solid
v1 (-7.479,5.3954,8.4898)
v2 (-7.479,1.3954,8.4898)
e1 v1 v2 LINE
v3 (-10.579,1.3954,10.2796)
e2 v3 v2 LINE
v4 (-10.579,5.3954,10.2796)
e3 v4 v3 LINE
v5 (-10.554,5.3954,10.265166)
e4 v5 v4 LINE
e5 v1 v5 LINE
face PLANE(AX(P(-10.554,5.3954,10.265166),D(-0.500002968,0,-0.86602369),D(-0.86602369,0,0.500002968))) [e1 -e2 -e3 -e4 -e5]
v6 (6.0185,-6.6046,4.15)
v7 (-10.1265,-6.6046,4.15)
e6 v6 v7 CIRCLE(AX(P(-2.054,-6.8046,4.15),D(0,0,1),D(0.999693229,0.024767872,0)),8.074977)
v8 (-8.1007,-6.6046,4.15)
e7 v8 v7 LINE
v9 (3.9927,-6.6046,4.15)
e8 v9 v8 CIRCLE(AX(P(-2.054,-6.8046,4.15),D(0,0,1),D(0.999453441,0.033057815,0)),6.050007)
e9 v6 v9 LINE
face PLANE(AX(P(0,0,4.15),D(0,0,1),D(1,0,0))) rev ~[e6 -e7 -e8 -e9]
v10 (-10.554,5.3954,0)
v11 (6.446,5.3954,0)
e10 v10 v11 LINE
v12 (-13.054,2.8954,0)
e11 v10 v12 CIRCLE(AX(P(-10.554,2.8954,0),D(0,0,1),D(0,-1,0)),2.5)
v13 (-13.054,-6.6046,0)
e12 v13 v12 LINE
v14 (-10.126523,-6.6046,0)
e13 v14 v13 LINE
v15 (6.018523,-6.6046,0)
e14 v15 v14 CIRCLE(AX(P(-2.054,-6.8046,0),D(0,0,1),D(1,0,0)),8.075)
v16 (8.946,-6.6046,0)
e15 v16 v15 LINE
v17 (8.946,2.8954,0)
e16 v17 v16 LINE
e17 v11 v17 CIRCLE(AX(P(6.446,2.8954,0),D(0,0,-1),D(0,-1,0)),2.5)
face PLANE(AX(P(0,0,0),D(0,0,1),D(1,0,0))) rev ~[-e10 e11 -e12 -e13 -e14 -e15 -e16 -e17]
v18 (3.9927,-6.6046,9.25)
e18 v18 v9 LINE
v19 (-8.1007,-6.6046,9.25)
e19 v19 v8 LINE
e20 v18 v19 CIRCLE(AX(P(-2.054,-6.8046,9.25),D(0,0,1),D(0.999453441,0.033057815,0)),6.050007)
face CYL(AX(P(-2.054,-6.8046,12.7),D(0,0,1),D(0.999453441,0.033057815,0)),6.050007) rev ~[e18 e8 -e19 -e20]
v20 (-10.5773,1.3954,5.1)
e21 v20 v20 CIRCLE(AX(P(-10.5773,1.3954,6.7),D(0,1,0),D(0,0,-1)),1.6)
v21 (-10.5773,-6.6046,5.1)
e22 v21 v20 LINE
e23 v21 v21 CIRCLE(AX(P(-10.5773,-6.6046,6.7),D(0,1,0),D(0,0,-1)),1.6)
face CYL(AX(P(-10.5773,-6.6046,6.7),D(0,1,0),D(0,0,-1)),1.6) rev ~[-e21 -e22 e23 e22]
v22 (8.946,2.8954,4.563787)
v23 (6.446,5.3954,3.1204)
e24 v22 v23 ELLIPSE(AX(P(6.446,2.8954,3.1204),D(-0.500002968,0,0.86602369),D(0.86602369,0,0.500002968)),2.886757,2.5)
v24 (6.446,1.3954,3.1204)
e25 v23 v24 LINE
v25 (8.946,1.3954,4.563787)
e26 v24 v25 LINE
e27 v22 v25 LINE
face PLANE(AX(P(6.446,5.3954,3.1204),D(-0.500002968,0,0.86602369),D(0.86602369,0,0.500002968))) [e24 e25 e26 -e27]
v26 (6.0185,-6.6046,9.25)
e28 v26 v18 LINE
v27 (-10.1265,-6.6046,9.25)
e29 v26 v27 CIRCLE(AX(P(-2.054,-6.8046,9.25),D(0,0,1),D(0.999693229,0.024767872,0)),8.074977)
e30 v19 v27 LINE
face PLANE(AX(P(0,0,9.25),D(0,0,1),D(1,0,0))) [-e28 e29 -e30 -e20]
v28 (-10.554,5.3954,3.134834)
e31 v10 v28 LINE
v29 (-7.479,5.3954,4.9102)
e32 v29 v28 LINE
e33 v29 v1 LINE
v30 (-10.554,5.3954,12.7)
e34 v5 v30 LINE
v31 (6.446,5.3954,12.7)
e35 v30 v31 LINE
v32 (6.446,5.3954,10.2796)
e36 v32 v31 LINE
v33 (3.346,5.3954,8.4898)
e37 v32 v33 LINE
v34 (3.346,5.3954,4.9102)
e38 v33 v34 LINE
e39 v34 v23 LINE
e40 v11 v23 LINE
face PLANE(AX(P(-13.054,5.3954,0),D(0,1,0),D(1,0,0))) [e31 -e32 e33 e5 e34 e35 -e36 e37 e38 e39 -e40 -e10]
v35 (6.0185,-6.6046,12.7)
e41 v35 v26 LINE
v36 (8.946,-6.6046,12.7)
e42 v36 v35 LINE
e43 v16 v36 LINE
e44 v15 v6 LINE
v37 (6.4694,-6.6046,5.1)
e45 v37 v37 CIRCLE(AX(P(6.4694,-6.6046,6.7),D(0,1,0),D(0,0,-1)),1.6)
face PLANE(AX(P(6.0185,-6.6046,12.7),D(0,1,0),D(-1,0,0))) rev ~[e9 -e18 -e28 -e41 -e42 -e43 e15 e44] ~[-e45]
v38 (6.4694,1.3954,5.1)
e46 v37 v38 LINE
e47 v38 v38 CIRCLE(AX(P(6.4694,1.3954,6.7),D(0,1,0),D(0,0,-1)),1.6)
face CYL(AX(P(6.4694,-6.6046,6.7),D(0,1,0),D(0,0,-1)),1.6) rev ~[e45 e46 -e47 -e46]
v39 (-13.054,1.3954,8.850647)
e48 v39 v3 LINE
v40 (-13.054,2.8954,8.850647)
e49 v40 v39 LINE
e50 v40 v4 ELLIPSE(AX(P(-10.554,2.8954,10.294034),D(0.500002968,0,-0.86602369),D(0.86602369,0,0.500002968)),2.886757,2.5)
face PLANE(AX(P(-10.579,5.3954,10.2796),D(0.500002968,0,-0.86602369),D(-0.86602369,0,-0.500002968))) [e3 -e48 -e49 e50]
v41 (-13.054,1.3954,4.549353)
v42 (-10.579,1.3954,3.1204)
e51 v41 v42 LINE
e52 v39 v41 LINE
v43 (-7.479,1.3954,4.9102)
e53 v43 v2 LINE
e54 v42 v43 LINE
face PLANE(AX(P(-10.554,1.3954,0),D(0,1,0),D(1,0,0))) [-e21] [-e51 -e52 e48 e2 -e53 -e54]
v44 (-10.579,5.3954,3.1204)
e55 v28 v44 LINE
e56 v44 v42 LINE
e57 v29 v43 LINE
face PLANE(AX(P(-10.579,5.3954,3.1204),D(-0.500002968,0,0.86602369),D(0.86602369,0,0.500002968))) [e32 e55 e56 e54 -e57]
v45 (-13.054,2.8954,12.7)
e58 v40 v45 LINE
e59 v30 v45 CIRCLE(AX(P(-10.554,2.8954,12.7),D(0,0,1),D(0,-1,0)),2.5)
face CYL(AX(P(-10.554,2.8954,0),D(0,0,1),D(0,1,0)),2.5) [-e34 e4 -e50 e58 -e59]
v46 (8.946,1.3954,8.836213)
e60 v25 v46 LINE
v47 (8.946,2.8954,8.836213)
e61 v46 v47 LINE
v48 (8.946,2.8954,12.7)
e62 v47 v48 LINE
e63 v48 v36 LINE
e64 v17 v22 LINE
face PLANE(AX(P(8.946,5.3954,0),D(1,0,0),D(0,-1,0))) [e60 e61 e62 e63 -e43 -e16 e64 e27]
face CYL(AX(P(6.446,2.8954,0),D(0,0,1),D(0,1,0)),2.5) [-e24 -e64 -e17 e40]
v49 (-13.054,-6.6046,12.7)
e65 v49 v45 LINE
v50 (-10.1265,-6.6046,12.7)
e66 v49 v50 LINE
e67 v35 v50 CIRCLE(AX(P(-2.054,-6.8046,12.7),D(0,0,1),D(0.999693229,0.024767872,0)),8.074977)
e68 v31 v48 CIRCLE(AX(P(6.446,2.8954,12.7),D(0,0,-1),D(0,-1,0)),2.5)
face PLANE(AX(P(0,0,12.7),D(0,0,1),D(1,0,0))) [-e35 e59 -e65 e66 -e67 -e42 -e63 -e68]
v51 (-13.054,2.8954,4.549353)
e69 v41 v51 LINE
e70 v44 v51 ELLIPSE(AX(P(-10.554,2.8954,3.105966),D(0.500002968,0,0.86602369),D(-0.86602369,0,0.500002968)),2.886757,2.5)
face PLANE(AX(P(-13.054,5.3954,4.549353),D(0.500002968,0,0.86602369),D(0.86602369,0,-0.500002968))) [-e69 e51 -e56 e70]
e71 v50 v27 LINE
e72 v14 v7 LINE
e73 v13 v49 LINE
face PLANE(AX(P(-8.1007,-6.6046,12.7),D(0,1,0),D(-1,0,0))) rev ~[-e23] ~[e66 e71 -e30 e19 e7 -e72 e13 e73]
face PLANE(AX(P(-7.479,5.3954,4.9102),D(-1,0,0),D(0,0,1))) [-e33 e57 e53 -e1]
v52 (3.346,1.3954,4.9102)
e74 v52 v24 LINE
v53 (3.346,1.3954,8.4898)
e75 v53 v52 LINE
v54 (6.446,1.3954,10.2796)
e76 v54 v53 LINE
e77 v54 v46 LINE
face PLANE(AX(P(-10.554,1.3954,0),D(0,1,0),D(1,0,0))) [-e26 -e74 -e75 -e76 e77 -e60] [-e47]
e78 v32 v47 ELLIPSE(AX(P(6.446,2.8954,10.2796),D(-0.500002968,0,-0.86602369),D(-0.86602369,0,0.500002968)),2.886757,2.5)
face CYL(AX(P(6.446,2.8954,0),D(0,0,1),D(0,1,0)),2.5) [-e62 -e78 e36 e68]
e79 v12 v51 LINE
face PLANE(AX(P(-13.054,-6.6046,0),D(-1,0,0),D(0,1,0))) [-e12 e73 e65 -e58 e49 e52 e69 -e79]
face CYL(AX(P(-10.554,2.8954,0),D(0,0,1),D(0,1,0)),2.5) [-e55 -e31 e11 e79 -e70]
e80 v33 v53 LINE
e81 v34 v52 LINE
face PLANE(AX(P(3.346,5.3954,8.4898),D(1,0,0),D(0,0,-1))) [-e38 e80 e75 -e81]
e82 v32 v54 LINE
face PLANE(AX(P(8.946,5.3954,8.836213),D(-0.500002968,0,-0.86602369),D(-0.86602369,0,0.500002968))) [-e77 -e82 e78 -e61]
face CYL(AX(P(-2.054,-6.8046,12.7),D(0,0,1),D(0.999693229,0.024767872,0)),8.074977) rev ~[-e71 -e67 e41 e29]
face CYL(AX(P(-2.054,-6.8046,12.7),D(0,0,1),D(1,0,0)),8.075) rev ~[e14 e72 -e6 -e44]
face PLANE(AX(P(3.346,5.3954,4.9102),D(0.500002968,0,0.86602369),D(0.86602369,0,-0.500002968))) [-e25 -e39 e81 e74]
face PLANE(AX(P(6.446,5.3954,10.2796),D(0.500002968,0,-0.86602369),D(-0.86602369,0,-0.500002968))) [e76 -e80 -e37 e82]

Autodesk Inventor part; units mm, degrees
ref_plane "YZ Plane" through (0, 0, 0) normal (1, 0, 0) x (0, 1, 0)
ref_plane "XZ Plane" through (0, 0, 0) normal (0, 1, 0) x (-1, 0, 0)
ref_plane "XY Plane" through (0, 0, 0) normal (0, 0, 1) x (1, 0, 0)
sketch "Szkic1" plane through (0, 0, 0) normal (0, 0, 1) x (1, 0, 0)
  line L0 (-13.054, 5.3954) -> (8.946, 5.3954)
  line L1 (8.946, 5.3954) -> (8.946, -6.6046)
  line L2 (8.946, -6.6046) -> (-13.054, -6.6046)
  line L3 (-13.054, -6.6046) -> (-13.054, 5.3954)
  point P0 (0, 0)
  dimension "d0" = 22
  dimension "d1" = 12
extrude "Wyciągnięcie proste1" add sketch "Szkic1" along normal blind 12.7
fillet "Zaokrąglenie1" radius 2.5 2 edges at (-13.054, 5.3954, 6.35) (8.946, 5.3954, 6.35)
sketch "Szkic2" plane through (0, 0, 12.7) normal (0, 0, 1) x (1, 0, 0)
  line L0 (8.946, -6.6046) -> (8.946, 2.8954) projected
  line L1 (-13.054, 2.8954) -> (-13.054, -6.6046) projected
  circle A0 centre (-2.054, -6.8046) radius 8.075
  line L2 (6.446, 5.3954) -> (-10.554, 5.3954) projected
  point P0 (0, 0)
  dimension "d5" = 22
  dimension "d6" = 11
  dimension "d7" = 16.15
  dimension "d10" = 12.2
extrude "Wyciągnięcie proste2" cut sketch "Szkic2" against normal blind 12.7
sketch "Szkic3" plane through (0, 0, 12.7) normal (0, 0, 1) x (1, 0, 0)
  arc A0 (6.0185, -6.6046) -> (-10.1265, -6.6046) centre (-2.054, -6.8046) ccw projected
  line L0 (6.0185, -6.6046) -> (8.946, -6.6046) projected
  line L1 (8.946, -6.6046) -> (8.946, 2.8954) projected
  arc A1 (8.946, 2.8954) -> (6.446, 5.3954) centre (6.446, 2.8954) ccw projected
  line L2 (6.446, 5.3954) -> (-10.554, 5.3954) projected
  arc A2 (-10.554, 5.3954) -> (-13.054, 2.8954) centre (-10.554, 2.8954) ccw projected
  line L3 (-13.054, 2.8954) -> (-13.054, -6.6046) projected
  line L4 (-13.054, -6.6046) -> (-10.1265, -6.6046) projected
  arc A3 (3.9927, -6.6046) -> (-8.1007, -6.6046) centre (-2.054, -6.8046) ccw
  arc A4 (6.0185, -6.6046) -> (-10.1265, -6.6046) centre (-2.054, -6.8046) ccw projected
  line L5 (6.0185, -6.6046) -> (-10.1265, -6.6046)
  point P0 (0, 0)
  dimension "d11" = 12.1
extrude "Wyciągnięcie proste3" add sketch "Szkic3" against normal blind 8.55 contours L5 A3 A0
extrude "Wyciągnięcie proste4" cut sketch "Szkic3" against normal blind 3.45 contours L5 A3 A0
sketch "Szkic4" plane through (-13.054, -6.6046, 0) normal (0, -1, 0) x (1, 0, 0)
  line L0 (0, 0) -> (0, 12.7) projected
  line L1 (22, 0) -> (22, 12.7) projected
  line L2 (4.9533, 9.25) -> (2.9275, 9.25) projected
  line L3 (19.0725, 9.25) -> (17.0467, 9.25) projected
  line L4 (4.9533, 9.25) -> (4.9533, 4.15) projected
  line L5 (4.9533, 4.15) -> (2.9275, 4.15) projected
  point P0 (13.054, 0)
  point P1 (2.4767, 6.7)
  point P2 (19.5233, 6.7)
  dimension "d16" = 2.4766
  dimension "d17" = 2.4766
  dimension "d18" = 2.55
  dimension "d19" = 2.55
  dimension "d33" = 4.9533
  dimension "d34" = 5.1
hole "Otwór1" at (-10.5773, -6.6046, 6.7) at (6.4694, -6.6046, 6.7) direction (0, 1, 0) diameter 3.2 end through all
sketch "Szkic5" plane through (-10.554, 5.3954, 0) normal (0, 1, 0) x (1, 0, 0)
  arc A0 (0, -8.2998) -> (0, -5.1002) centre (-0.0233, -6.7) ccw projected
  line L0 (0, -12.7) -> (0, -8.2998) projected
  line L1 (17, -12.7) -> (0, -12.7) projected
  line L2 (17, -8.2998) -> (17, -12.7) projected
  arc A1 (17, -5.1002) -> (17, -8.2998) centre (17.0233, -6.7) ccw projected
  line L3 (17, 0) -> (17, -5.1002) projected
  line L4 (0, 0) -> (17, 0) projected
  line L5 (0, -5.1002) -> (0, 0) projected
  line L6 (19.5, -12.7) -> (19.5, 0) projected
  line L7 (-2.5, 0) -> (-2.5, -12.7) projected
  line L8 (-3.125, -4.9102) -> (-0.025, -3.1204)
  line L9 (-0.025, -3.1204) -> (3.075, -4.9102)
  line L10 (3.075, -4.9102) -> (3.075, -8.4898)
  line L11 (3.075, -8.4898) -> (-0.025, -10.2796)
  line L12 (-0.025, -10.2796) -> (-3.125, -8.4898)
  line L13 (-3.125, -8.4898) -> (-3.125, -4.9102)
  line L14 (13.9, -4.9102) -> (17, -3.1204)
  line L15 (17, -3.1204) -> (20.1, -4.9102)
  line L16 (20.1, -4.9102) -> (20.1, -8.4898)
  line L17 (20.1, -8.4898) -> (17, -10.2796)
  line L18 (17, -10.2796) -> (13.9, -8.4898)
  line L19 (13.9, -8.4898) -> (13.9, -4.9102)
  point P0 (10.554, 0)
  point P1 (17, -6.7)
  point P2 (-0.025, -6.7)
  point P3 (-0.025, -6.7)
  point P4 (-3.125, -6.7)
  point P5 (17, -6.7)
  point P6 (13.9, -6.7)
extrude "Wyciągnięcie proste6" cut sketch "Szkic5" against normal blind 4 contours L0 L11 L12 L7 L8 L9 L5 A0 | A0 L5 L9 L10 L11 L0 | L12 L13 L8 L7 | L18 L19 L14 L3 A1 L2 | L2 A1 L3 L15 L6 L17 | L6 L15 L16 L17
equation "\"d6\" = 0.5 * d5"
equation "\"d16\" = 0.5 * d33"
equation "\"d17\" = d16"
equation "\"d18\" = 0.5 * d34"
equation "\"d19\" = d18"
properties part number "3DP_ABS_E3DV6_Mounting_Clamp"
